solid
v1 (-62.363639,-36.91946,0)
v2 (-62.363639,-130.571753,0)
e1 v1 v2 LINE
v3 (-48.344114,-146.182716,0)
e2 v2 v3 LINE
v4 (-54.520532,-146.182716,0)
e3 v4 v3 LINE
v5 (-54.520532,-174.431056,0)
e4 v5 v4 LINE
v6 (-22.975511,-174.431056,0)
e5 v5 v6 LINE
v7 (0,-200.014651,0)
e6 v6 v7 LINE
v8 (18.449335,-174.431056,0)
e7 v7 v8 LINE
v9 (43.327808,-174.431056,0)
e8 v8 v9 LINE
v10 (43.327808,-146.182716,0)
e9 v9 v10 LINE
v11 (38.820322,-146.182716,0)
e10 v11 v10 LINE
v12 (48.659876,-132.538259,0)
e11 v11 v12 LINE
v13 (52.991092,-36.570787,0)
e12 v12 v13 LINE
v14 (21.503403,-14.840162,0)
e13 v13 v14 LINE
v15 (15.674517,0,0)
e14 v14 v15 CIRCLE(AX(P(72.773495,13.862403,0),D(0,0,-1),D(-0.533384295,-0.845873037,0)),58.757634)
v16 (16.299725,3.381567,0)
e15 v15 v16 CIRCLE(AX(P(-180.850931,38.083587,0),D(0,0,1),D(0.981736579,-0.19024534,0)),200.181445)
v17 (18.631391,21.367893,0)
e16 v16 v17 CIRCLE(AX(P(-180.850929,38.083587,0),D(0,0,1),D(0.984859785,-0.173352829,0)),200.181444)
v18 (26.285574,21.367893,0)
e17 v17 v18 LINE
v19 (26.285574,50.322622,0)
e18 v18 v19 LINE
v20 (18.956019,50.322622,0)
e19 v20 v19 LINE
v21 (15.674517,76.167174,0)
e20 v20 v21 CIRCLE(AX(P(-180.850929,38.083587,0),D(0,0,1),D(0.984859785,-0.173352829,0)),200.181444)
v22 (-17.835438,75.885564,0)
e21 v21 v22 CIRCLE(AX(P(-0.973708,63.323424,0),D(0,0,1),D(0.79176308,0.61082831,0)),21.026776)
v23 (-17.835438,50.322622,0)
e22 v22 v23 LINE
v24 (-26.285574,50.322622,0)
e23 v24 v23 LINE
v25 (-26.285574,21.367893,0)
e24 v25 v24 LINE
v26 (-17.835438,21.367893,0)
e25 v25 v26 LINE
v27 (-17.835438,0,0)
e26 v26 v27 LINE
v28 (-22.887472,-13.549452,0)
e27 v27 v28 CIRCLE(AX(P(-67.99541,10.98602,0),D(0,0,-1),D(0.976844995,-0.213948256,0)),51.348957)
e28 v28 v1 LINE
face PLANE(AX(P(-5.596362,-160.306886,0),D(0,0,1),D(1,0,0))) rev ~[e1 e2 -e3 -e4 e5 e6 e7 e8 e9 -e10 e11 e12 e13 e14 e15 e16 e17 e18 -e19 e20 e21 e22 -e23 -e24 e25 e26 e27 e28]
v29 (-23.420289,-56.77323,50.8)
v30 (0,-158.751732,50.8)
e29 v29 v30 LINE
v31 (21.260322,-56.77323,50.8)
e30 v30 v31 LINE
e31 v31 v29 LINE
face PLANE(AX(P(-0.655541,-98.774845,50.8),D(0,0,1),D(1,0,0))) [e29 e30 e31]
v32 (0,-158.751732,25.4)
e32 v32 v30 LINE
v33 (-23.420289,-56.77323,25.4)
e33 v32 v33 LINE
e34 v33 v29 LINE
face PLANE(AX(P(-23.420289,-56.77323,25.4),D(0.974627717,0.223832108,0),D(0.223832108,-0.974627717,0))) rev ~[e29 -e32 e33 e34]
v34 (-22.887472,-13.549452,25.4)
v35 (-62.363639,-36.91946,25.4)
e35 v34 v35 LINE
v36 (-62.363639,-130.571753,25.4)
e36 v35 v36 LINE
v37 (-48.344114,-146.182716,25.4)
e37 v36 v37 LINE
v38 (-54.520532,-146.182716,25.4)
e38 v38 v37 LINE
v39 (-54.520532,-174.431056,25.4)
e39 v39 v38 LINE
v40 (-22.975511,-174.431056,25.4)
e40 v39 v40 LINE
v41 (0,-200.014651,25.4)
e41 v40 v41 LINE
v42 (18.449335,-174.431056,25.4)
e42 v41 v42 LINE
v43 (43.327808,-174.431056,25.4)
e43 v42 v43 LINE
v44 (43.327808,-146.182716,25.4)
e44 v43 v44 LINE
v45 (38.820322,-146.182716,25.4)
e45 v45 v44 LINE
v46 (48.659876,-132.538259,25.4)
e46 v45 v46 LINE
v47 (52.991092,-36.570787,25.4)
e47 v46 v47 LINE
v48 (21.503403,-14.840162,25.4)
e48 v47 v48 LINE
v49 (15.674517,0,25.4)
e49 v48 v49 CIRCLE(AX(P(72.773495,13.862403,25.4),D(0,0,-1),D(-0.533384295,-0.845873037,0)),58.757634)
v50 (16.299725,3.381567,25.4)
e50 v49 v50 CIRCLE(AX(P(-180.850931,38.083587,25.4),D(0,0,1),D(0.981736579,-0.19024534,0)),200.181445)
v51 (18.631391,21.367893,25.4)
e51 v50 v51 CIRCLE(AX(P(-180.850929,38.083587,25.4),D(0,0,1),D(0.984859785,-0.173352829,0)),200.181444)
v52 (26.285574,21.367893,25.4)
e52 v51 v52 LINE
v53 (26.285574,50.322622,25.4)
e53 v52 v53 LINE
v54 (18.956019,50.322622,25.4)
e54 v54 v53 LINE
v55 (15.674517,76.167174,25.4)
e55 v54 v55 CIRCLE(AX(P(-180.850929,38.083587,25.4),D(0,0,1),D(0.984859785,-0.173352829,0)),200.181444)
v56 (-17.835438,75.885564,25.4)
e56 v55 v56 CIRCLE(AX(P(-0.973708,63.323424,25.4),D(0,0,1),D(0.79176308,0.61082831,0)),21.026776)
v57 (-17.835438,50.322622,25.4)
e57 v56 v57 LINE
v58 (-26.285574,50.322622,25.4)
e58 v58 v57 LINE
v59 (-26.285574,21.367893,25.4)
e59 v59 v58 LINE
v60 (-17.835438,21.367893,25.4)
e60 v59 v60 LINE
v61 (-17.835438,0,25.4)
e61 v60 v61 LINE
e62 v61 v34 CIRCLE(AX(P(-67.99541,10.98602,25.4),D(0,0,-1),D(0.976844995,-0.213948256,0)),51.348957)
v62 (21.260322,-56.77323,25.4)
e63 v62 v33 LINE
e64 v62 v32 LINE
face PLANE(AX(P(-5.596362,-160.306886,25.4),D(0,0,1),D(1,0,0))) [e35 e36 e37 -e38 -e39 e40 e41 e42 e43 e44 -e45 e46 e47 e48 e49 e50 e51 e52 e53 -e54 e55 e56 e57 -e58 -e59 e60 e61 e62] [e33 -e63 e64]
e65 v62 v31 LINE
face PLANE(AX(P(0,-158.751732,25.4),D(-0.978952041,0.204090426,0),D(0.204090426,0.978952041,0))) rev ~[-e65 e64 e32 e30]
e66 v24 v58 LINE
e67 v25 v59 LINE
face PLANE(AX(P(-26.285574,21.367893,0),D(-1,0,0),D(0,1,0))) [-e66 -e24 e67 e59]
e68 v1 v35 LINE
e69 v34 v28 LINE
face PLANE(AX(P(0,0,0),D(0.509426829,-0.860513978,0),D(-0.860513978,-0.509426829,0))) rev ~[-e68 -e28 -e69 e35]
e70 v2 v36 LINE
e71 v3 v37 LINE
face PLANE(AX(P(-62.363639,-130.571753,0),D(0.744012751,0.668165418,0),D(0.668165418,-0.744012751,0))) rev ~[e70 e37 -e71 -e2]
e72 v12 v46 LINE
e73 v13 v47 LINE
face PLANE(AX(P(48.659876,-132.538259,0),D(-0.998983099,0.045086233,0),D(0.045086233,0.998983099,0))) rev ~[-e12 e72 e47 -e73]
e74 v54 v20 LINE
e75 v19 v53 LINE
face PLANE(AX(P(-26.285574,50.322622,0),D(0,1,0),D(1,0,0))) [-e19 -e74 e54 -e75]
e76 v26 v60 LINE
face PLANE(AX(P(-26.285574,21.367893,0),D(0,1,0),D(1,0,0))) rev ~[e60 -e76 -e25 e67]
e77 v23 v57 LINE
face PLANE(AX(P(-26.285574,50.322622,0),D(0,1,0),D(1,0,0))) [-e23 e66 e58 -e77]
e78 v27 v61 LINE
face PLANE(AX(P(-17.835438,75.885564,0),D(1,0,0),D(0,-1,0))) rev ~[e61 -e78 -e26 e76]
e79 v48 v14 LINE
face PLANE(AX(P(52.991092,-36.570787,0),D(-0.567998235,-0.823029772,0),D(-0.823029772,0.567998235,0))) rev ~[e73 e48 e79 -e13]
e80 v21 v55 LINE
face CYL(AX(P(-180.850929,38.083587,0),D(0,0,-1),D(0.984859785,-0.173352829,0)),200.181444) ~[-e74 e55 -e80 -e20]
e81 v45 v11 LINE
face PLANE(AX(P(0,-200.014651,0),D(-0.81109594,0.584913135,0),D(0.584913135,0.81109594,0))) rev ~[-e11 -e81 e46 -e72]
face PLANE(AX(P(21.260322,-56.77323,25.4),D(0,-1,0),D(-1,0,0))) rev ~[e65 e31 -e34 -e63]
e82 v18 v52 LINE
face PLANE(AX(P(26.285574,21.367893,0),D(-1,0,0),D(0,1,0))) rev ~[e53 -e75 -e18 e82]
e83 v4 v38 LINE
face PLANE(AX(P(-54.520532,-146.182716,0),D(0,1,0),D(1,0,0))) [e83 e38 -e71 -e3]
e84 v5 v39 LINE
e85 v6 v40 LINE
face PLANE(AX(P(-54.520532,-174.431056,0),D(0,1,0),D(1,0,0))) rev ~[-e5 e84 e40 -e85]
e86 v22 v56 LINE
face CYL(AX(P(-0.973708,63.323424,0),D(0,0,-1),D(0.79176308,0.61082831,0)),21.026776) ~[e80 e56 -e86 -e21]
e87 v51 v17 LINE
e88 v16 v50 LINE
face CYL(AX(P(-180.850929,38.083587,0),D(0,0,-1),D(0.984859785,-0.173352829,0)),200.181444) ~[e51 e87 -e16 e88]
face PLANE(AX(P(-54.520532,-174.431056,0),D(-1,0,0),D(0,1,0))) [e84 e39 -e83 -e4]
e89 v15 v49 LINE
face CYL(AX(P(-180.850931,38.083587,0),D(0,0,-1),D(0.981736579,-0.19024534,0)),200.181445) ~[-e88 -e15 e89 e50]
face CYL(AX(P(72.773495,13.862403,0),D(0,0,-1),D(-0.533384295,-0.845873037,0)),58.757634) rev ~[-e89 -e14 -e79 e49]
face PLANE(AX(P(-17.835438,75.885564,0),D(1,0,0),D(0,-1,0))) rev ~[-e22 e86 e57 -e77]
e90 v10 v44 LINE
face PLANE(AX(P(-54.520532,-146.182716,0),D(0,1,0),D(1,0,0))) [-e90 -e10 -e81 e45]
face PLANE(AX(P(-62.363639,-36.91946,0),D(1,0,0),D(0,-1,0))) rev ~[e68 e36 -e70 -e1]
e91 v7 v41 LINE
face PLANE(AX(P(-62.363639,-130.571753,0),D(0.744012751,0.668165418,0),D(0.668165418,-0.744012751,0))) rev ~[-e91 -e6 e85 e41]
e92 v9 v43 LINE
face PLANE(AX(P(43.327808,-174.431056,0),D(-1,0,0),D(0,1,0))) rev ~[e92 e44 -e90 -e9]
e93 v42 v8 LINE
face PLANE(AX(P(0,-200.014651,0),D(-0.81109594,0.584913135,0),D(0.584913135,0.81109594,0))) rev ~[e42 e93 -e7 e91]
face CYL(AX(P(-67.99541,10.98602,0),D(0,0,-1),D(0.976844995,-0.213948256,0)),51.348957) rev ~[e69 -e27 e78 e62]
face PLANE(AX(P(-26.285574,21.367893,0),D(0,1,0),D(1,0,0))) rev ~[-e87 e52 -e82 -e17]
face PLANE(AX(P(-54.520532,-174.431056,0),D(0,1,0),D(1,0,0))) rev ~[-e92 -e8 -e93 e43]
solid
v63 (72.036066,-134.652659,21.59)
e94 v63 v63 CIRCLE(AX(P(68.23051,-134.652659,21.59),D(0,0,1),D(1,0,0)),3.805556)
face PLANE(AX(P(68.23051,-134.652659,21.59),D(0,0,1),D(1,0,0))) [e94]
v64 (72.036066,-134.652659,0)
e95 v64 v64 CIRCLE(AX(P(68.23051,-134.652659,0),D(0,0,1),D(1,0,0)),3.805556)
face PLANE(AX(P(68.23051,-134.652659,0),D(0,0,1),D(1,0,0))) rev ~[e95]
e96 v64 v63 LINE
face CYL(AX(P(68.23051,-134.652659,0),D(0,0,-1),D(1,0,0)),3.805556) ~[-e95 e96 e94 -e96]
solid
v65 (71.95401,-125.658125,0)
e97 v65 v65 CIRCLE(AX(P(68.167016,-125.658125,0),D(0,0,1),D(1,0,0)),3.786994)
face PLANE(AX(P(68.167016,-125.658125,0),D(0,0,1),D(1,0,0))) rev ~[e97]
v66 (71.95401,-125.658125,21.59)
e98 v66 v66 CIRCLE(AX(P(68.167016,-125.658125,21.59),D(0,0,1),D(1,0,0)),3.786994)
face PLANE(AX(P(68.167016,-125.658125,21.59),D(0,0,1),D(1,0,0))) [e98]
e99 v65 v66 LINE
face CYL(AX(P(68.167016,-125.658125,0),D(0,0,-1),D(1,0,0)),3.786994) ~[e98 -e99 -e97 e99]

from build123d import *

# Parameters (mm, degrees)
F0_DEPTH  = 25.4
F15_DEPTH = 25.4
F6_DEPTH  = 25.4
F7_W      = 52.5711476803
F7_H      = 28.9547294378
F8_DEPTH  = 25.4
F9_R      = 3.7869940918
F10_DEPTH = 21.59
F18_R     = 3.8055561705
F11_DEPTH = 21.59
F19_W     = 97.8483408689
F19_H     = 28.2483398914
F12_DEPTH = 25.4


# Not quite as in the source:
# - the program builds the solid bodies; features that only make, move or delete a surface that nothing else refers to are left out


with BuildPart() as f0:
    # F13 (on Top) → F0 (new body)
    with BuildSketch(Plane.XY):
        with BuildLine():
            ThreePointArc((16.2997245058, 3.3815672953), (19.3231299232, 39.8030258746), (15.6745165586, 76.1671736836))
            ThreePointArc((15.6745165586, 76.1671736836), (-1.1504060771, 84.3494571695), (-17.8354382515, 75.8855640888))
            Line((-17.8354382515, 75.8855640888), (-17.8354382515, 0))
            ThreePointArc((-17.8354382515, 0), (-29.0742141651, -22.5080976821), (-49.6557429433, -36.9761735201))
            ThreePointArc((-49.6557429433, -36.9761735201), (-53.2002321262, -80.6407257915), (-49.6557429433, -124.3052780628))
            ThreePointArc((-49.6557429433, -124.3052780628), (-28.552755811, -158.7517318324), (0, -187.3285472393))
            ThreePointArc((0, -187.3285472393), (23.5369802762, -157.5088719546), (41.433095932, -123.9987015724))
            ThreePointArc((41.433095932, -123.9987015724), (43.4568628888, -79.9188986421), (41.433095932, -35.8390957117))
            ThreePointArc((41.433095932, -35.8390957117), (25.0609068527, -20.4299941844), (15.6745165586, 0))
            ThreePointArc((15.6745165586, 0), (15.9943820769, 1.6894410822), (16.2997245058, 3.3815672953))
        make_face()
    extrude(amount=F0_DEPTH)

    # F14 (on face) → F15 (join)
    with BuildSketch(Plane.XY.offset(25.4)):
        Polygon((21.2603222236, -56.7732304335), (-23.4202891588, -56.7732304335), (0, -158.7517318324), align=None)
    extrude(amount=F15_DEPTH)

    # F5 (on Top) → F6 (join)
    with BuildSketch(Plane.XY):
        Polygon((0, 0), (-62.3636394739, -36.9194597006), (-62.3636394739, -130.5717527866), (0, -200.0146508217), (48.659875989, -132.5382590294), (52.991092205, -36.5707874298), align=None)
    extrude(amount=F6_DEPTH)

    # F7 (on Top) → F8 (join)
    with BuildSketch(Plane.XY):
        with Locations((0, 35.8452573419)):
            Rectangle(F7_W, F7_H)
    extrude(amount=F8_DEPTH)

    # F19 (on Top) → F12 (join)
    with BuildSketch(Plane.XY):
        with Locations((-5.5963620543, -160.3068858385)):
            Rectangle(F19_W, F19_H)
    extrude(amount=F12_DEPTH)


with BuildPart() as f10:
    # F9 (on Top) → F10 (new body)
    with BuildSketch(Plane.XY):
        with Locations((68.1670159101, -125.6581246853)):
            Circle(F9_R)
    extrude(amount=F10_DEPTH)


with BuildPart() as f11:
    # F18 (on Top) → F11 (new body)
    with BuildSketch(Plane.XY):
        with Locations((68.230509758, -134.652659297)):
            Circle(F18_R)
    extrude(amount=F11_DEPTH)


solid = Compound([f0.part, f10.part, f11.part])
